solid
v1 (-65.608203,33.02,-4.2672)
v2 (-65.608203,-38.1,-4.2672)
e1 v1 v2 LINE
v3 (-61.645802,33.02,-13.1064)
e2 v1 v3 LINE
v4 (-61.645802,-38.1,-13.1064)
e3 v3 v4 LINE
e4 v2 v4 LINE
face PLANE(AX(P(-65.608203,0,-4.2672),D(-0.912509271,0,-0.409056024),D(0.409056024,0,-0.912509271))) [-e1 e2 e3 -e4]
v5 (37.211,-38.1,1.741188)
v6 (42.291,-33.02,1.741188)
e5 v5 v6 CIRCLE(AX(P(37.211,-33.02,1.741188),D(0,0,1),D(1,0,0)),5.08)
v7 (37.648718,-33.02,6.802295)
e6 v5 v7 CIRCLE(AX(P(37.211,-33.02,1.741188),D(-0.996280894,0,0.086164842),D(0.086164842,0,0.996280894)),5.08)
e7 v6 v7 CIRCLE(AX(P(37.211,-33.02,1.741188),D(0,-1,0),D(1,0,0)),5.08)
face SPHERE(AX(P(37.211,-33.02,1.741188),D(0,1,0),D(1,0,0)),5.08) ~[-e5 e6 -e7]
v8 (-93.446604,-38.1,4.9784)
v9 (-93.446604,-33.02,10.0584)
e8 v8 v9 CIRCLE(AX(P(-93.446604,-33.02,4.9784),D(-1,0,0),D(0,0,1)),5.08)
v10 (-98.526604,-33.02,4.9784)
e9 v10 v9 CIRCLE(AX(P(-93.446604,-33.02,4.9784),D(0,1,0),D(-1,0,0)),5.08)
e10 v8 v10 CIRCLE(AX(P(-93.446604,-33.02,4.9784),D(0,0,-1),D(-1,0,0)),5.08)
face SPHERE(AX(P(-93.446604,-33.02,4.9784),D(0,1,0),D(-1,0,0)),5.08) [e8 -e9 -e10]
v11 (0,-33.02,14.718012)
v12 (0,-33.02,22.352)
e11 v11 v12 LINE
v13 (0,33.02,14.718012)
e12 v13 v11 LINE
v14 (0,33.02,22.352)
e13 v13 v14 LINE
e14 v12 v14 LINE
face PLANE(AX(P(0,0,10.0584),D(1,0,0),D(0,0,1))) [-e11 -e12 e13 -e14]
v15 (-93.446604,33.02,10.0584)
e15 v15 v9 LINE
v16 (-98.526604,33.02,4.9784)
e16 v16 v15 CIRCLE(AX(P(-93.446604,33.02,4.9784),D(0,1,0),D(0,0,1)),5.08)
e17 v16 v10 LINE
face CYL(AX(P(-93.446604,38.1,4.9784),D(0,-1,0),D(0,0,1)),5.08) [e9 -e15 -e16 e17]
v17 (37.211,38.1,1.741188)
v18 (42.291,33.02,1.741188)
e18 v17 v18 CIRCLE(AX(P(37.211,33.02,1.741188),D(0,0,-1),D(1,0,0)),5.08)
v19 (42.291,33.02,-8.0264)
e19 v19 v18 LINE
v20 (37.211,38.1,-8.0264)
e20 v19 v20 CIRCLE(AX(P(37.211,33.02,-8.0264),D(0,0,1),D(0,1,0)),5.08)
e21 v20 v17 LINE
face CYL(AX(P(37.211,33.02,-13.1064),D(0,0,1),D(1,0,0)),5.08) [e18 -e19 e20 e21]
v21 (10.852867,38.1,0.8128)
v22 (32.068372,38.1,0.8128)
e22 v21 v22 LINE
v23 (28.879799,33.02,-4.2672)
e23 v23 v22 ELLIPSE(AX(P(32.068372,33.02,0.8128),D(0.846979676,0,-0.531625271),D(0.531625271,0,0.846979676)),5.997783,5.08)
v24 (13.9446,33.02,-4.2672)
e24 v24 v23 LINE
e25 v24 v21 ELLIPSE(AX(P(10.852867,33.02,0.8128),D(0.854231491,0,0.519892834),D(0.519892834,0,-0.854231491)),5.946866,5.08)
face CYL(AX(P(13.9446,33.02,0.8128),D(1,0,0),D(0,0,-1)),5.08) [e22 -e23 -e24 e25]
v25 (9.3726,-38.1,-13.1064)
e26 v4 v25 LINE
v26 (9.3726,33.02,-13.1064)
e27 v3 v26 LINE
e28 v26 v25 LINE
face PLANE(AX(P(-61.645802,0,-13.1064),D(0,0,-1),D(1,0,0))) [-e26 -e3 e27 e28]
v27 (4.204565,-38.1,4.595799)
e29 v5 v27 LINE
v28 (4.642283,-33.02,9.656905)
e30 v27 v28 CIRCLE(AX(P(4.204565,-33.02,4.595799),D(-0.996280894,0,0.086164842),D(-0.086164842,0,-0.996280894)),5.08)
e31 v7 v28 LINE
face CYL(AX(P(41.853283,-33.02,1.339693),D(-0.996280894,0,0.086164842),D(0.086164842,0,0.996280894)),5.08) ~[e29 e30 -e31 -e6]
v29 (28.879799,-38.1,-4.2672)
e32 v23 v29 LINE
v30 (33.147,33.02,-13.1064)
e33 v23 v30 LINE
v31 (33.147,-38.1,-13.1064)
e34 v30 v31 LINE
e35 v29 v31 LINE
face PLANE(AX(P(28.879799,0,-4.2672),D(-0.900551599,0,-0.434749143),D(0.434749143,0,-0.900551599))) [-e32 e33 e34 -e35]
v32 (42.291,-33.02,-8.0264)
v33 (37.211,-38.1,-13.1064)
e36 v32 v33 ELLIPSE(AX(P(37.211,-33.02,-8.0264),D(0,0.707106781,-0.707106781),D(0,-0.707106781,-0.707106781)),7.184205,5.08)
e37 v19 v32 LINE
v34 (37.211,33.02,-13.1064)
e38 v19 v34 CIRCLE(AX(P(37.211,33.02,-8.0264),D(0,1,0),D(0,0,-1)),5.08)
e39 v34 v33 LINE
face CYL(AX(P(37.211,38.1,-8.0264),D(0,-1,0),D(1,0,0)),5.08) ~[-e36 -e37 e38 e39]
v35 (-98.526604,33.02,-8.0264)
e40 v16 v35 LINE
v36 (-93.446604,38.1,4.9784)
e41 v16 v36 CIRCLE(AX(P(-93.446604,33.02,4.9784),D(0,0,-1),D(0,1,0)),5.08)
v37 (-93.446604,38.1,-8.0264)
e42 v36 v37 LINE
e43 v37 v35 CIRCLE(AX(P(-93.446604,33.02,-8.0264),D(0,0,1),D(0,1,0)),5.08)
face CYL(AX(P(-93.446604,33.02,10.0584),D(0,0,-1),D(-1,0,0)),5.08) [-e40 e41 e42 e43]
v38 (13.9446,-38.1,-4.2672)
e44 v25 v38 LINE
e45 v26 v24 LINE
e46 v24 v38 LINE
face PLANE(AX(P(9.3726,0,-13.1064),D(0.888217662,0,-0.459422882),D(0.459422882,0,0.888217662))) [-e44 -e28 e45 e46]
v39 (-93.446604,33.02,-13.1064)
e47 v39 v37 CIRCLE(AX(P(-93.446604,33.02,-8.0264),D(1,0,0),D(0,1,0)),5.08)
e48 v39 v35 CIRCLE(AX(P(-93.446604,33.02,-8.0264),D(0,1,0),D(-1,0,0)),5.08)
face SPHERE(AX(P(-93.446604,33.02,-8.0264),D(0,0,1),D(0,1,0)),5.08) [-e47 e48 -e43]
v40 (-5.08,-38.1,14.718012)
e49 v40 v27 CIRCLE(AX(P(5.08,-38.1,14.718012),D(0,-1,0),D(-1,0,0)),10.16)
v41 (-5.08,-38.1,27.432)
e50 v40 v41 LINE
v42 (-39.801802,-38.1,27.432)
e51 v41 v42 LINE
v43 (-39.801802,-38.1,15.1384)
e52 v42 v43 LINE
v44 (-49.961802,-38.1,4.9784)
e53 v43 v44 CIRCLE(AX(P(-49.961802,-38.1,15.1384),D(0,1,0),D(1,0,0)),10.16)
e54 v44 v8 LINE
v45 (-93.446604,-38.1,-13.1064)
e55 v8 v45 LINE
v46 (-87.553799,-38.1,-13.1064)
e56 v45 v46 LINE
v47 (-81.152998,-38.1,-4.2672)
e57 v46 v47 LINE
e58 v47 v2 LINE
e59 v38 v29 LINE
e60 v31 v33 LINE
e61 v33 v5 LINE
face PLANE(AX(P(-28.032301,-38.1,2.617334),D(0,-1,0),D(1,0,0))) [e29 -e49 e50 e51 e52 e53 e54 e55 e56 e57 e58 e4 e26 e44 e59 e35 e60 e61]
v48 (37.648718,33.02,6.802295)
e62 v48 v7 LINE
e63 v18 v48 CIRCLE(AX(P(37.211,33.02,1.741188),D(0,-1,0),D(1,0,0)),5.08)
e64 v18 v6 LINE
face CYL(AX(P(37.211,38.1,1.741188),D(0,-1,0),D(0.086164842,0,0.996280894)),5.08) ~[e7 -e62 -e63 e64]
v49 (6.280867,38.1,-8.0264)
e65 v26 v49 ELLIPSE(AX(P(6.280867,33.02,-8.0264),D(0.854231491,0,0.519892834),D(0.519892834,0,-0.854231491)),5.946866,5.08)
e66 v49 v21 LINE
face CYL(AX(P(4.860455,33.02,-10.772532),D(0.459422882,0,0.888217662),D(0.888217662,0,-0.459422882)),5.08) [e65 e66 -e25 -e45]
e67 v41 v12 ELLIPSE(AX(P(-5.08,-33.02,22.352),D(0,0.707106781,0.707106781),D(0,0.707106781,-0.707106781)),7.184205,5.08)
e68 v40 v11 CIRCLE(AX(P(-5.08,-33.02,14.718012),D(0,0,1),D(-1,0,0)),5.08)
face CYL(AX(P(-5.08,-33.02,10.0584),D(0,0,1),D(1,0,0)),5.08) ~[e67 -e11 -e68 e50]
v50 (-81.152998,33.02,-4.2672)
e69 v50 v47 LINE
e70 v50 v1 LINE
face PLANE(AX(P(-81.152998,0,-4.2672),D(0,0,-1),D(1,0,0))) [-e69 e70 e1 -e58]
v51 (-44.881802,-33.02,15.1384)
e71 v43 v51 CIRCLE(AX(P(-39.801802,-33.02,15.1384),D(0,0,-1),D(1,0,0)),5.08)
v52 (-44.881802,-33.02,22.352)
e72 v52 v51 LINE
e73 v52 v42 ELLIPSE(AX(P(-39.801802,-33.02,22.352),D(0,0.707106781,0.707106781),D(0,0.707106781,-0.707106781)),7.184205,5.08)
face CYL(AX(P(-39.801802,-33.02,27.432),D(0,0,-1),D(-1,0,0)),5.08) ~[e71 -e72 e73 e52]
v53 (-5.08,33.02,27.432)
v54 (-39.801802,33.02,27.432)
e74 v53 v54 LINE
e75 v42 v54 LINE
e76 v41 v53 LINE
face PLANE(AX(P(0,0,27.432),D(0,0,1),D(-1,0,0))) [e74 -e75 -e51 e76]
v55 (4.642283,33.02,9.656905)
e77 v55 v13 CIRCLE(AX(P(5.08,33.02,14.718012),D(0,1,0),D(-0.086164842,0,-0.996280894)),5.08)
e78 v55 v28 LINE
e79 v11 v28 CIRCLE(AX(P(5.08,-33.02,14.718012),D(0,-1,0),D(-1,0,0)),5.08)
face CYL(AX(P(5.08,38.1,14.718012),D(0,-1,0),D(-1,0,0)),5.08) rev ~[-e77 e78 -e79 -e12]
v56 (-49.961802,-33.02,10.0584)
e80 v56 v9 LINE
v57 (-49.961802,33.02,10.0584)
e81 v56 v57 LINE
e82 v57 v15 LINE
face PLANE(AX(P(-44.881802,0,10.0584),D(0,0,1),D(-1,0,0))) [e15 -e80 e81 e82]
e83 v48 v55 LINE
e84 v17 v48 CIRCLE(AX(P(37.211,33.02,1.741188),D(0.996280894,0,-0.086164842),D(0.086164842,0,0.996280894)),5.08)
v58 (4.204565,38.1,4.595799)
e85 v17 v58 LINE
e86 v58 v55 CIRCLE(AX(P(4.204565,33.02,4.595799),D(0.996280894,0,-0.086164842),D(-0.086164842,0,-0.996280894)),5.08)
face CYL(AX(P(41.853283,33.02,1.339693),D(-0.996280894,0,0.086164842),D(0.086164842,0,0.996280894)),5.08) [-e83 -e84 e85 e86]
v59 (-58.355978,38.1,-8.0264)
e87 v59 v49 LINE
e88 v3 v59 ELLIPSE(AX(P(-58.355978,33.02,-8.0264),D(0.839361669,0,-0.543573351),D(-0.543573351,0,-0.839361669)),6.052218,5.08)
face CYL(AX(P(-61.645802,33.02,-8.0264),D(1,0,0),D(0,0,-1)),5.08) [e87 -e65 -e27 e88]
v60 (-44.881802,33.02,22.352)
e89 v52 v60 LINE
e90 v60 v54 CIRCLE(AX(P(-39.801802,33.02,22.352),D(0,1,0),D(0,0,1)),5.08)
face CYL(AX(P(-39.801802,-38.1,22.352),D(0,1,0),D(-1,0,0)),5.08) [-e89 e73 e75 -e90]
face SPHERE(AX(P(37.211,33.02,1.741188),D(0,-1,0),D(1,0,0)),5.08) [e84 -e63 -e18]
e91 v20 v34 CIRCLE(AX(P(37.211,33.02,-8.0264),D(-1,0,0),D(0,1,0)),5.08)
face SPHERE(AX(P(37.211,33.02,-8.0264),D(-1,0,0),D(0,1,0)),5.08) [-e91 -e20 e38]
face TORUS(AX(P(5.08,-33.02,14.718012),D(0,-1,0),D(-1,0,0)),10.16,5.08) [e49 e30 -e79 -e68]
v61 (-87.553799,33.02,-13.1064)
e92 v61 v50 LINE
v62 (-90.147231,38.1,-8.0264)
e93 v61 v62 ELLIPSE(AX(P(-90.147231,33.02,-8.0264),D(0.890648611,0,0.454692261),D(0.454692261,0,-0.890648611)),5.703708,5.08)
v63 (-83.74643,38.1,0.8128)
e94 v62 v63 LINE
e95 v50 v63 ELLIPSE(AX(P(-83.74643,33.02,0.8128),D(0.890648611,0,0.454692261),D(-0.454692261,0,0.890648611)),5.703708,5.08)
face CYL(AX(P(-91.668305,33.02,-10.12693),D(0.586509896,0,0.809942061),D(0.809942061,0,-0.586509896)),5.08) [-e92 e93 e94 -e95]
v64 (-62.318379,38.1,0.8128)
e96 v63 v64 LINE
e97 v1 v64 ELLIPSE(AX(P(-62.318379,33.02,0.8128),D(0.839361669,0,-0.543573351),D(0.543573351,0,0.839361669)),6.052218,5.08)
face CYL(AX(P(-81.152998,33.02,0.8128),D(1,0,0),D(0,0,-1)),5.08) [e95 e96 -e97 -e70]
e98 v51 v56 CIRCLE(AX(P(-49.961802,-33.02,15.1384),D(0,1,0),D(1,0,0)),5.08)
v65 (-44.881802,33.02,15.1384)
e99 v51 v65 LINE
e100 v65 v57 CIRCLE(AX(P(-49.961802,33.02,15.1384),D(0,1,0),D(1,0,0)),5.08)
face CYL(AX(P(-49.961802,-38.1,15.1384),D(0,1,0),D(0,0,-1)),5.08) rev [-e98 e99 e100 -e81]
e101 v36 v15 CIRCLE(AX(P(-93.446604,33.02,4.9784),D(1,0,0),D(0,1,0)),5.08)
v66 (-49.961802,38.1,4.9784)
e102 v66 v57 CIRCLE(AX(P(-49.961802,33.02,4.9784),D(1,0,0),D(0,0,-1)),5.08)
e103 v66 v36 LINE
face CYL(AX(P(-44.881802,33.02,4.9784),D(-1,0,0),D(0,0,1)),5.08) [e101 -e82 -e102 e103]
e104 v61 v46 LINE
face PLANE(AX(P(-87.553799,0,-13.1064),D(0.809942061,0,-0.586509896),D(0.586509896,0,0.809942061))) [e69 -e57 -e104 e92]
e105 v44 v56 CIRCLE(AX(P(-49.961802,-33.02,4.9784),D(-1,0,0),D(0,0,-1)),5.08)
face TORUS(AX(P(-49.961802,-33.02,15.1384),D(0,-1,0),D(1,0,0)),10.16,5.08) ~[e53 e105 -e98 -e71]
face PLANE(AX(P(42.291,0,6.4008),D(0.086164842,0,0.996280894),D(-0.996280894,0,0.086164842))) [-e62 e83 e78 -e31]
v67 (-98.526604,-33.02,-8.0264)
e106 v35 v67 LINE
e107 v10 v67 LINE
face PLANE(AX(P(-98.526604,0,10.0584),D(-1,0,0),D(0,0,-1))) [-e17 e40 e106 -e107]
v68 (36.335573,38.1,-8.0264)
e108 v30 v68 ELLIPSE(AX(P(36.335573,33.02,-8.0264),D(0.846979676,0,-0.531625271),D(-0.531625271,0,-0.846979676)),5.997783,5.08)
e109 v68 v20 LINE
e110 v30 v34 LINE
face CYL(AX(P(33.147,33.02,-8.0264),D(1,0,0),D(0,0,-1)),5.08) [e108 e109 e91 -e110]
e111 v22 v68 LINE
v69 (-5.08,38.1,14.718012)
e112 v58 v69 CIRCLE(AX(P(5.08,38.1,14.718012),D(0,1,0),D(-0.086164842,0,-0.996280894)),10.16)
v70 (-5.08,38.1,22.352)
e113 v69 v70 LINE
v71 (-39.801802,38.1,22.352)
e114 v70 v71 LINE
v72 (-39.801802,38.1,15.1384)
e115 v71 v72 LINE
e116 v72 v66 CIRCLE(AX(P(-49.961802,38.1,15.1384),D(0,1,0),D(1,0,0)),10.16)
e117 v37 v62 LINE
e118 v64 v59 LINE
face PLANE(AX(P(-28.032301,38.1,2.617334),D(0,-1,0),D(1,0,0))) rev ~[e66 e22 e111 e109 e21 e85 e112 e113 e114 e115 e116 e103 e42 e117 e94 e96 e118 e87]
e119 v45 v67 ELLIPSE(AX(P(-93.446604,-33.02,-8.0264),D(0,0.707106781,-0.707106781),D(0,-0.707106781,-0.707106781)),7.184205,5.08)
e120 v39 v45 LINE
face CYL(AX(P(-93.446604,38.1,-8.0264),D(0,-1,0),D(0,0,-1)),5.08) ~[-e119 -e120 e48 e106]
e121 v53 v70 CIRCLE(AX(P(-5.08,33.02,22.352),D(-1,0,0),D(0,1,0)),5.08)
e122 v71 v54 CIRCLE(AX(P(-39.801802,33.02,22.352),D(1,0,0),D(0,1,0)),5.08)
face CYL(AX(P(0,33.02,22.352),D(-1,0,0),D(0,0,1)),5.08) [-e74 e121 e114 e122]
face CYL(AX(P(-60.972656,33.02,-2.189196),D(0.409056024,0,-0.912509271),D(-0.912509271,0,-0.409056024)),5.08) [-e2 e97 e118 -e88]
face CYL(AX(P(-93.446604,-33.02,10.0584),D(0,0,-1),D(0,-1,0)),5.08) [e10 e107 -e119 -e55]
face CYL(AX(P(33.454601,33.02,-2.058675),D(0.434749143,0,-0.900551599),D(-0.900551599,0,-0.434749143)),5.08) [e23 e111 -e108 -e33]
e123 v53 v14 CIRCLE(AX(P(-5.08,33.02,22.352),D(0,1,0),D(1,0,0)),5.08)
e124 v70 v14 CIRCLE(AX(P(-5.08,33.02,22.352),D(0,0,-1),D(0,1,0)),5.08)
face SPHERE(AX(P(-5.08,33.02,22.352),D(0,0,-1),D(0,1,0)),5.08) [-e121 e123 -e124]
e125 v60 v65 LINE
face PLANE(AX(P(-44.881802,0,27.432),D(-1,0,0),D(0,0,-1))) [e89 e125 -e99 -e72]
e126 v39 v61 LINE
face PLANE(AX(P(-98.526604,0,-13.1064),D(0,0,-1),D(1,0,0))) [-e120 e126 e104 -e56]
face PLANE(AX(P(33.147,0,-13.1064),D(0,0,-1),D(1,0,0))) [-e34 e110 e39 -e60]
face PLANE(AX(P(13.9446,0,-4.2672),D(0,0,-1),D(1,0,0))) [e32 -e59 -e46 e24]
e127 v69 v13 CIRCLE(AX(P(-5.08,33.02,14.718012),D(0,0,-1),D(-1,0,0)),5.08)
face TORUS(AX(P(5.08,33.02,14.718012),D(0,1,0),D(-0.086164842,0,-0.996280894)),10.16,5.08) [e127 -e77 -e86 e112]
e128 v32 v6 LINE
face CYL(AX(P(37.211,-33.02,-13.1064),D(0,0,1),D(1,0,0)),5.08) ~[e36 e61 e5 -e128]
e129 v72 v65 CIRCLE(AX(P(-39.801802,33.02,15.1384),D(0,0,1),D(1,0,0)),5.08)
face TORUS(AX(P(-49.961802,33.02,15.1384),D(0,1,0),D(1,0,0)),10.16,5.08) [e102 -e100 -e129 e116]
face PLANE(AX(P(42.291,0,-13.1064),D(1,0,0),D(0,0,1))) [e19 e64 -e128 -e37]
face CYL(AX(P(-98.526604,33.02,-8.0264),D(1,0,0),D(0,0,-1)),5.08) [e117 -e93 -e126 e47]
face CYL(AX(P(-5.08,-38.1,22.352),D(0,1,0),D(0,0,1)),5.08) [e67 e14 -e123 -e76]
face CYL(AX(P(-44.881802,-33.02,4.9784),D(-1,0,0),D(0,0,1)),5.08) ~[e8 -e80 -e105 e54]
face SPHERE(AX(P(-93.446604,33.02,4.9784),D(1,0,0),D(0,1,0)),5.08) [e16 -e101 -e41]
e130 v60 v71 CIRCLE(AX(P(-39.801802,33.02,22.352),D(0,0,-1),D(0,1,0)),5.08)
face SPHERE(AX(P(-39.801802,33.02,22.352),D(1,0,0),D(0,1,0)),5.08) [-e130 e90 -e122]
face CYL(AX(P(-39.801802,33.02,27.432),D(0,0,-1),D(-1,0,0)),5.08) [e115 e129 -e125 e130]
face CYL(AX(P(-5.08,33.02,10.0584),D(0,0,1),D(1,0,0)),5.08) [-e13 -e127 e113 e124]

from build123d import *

# Parameters (mm, degrees)
F1_DEPTH = 38.1
F2_R     = 5.08


with BuildPart() as f1:
    # F0 (on Front) → F1 (new body, symmetric)
    with BuildSketch(Plane.XZ):
        Polygon((-44.8818020523, 10.0584002212), (-98.5266044736, 10.0584002212), (-98.5266044736, -13.1064001471), (-87.5537991524, -13.1064001471), (-81.152997911, -4.2672003619), (-65.6082034111, -4.2672003619), (-61.6458021104, -13.1064001471), (9.3726003543, -13.1064001471), (13.9445997775, -4.2672003619), (28.8797989488, -4.2672003619), (33.1469997764, -13.1064001471), (42.2910004854, -13.1064001471), (42.2910004854, 6.4007998444), (0, 10.0584002212), (0, 27.4320002645), (-44.8818020523, 27.4320002645), align=None)
    extrude(amount=F1_DEPTH, both=True)

    # F2
    f2_edges = [f1.edges().sort_by_distance(p)[0] for p in [
        (21.412199, 38.1, -4.2672),
        (31.013399, 38.1, -8.6868),
        (37.719, 38.1, -13.1064),
        (42.291, 38.1, -3.3528),
        (21.1455, 38.1, 8.2296),
        (0, 38.1, 18.7452),
        (-22.440901, 38.1, 27.432),
        (-44.881802, 38.1, 18.7452),
        (-71.704203, 38.1, 10.0584),
        (-98.526604, 38.1, -1.524),
        (-93.040202, 38.1, -13.1064),
        (-84.353399, 38.1, -8.6868),
        (-73.380601, 38.1, -4.2672),
        (-63.627003, 38.1, -8.6868),
        (-26.136601, 38.1, -13.1064),
        (11.6586, 38.1, -8.6868),
        (-98.526604, 0, 10.0584),
        (-98.526604, 0, -13.1064),
        (-98.526604, -38.1, -1.524),
        (-44.881802, 0, 27.432),
        (-44.881802, 0, 10.0584),
        (-44.881802, -38.1, 18.7452),
        (0, 0, 10.0584),
        (0, 0, 27.432),
        (0, -38.1, 18.7452),
        (42.291, 0, -13.1064),
        (42.291, 0, 6.4008),
        (42.291, -38.1, -3.3528),
        (-71.704203, -38.1, 10.0584),
        (21.1455, -38.1, 8.2296),
    ]]
    fillet(f2_edges, radius=F2_R)


solid = f1.part
